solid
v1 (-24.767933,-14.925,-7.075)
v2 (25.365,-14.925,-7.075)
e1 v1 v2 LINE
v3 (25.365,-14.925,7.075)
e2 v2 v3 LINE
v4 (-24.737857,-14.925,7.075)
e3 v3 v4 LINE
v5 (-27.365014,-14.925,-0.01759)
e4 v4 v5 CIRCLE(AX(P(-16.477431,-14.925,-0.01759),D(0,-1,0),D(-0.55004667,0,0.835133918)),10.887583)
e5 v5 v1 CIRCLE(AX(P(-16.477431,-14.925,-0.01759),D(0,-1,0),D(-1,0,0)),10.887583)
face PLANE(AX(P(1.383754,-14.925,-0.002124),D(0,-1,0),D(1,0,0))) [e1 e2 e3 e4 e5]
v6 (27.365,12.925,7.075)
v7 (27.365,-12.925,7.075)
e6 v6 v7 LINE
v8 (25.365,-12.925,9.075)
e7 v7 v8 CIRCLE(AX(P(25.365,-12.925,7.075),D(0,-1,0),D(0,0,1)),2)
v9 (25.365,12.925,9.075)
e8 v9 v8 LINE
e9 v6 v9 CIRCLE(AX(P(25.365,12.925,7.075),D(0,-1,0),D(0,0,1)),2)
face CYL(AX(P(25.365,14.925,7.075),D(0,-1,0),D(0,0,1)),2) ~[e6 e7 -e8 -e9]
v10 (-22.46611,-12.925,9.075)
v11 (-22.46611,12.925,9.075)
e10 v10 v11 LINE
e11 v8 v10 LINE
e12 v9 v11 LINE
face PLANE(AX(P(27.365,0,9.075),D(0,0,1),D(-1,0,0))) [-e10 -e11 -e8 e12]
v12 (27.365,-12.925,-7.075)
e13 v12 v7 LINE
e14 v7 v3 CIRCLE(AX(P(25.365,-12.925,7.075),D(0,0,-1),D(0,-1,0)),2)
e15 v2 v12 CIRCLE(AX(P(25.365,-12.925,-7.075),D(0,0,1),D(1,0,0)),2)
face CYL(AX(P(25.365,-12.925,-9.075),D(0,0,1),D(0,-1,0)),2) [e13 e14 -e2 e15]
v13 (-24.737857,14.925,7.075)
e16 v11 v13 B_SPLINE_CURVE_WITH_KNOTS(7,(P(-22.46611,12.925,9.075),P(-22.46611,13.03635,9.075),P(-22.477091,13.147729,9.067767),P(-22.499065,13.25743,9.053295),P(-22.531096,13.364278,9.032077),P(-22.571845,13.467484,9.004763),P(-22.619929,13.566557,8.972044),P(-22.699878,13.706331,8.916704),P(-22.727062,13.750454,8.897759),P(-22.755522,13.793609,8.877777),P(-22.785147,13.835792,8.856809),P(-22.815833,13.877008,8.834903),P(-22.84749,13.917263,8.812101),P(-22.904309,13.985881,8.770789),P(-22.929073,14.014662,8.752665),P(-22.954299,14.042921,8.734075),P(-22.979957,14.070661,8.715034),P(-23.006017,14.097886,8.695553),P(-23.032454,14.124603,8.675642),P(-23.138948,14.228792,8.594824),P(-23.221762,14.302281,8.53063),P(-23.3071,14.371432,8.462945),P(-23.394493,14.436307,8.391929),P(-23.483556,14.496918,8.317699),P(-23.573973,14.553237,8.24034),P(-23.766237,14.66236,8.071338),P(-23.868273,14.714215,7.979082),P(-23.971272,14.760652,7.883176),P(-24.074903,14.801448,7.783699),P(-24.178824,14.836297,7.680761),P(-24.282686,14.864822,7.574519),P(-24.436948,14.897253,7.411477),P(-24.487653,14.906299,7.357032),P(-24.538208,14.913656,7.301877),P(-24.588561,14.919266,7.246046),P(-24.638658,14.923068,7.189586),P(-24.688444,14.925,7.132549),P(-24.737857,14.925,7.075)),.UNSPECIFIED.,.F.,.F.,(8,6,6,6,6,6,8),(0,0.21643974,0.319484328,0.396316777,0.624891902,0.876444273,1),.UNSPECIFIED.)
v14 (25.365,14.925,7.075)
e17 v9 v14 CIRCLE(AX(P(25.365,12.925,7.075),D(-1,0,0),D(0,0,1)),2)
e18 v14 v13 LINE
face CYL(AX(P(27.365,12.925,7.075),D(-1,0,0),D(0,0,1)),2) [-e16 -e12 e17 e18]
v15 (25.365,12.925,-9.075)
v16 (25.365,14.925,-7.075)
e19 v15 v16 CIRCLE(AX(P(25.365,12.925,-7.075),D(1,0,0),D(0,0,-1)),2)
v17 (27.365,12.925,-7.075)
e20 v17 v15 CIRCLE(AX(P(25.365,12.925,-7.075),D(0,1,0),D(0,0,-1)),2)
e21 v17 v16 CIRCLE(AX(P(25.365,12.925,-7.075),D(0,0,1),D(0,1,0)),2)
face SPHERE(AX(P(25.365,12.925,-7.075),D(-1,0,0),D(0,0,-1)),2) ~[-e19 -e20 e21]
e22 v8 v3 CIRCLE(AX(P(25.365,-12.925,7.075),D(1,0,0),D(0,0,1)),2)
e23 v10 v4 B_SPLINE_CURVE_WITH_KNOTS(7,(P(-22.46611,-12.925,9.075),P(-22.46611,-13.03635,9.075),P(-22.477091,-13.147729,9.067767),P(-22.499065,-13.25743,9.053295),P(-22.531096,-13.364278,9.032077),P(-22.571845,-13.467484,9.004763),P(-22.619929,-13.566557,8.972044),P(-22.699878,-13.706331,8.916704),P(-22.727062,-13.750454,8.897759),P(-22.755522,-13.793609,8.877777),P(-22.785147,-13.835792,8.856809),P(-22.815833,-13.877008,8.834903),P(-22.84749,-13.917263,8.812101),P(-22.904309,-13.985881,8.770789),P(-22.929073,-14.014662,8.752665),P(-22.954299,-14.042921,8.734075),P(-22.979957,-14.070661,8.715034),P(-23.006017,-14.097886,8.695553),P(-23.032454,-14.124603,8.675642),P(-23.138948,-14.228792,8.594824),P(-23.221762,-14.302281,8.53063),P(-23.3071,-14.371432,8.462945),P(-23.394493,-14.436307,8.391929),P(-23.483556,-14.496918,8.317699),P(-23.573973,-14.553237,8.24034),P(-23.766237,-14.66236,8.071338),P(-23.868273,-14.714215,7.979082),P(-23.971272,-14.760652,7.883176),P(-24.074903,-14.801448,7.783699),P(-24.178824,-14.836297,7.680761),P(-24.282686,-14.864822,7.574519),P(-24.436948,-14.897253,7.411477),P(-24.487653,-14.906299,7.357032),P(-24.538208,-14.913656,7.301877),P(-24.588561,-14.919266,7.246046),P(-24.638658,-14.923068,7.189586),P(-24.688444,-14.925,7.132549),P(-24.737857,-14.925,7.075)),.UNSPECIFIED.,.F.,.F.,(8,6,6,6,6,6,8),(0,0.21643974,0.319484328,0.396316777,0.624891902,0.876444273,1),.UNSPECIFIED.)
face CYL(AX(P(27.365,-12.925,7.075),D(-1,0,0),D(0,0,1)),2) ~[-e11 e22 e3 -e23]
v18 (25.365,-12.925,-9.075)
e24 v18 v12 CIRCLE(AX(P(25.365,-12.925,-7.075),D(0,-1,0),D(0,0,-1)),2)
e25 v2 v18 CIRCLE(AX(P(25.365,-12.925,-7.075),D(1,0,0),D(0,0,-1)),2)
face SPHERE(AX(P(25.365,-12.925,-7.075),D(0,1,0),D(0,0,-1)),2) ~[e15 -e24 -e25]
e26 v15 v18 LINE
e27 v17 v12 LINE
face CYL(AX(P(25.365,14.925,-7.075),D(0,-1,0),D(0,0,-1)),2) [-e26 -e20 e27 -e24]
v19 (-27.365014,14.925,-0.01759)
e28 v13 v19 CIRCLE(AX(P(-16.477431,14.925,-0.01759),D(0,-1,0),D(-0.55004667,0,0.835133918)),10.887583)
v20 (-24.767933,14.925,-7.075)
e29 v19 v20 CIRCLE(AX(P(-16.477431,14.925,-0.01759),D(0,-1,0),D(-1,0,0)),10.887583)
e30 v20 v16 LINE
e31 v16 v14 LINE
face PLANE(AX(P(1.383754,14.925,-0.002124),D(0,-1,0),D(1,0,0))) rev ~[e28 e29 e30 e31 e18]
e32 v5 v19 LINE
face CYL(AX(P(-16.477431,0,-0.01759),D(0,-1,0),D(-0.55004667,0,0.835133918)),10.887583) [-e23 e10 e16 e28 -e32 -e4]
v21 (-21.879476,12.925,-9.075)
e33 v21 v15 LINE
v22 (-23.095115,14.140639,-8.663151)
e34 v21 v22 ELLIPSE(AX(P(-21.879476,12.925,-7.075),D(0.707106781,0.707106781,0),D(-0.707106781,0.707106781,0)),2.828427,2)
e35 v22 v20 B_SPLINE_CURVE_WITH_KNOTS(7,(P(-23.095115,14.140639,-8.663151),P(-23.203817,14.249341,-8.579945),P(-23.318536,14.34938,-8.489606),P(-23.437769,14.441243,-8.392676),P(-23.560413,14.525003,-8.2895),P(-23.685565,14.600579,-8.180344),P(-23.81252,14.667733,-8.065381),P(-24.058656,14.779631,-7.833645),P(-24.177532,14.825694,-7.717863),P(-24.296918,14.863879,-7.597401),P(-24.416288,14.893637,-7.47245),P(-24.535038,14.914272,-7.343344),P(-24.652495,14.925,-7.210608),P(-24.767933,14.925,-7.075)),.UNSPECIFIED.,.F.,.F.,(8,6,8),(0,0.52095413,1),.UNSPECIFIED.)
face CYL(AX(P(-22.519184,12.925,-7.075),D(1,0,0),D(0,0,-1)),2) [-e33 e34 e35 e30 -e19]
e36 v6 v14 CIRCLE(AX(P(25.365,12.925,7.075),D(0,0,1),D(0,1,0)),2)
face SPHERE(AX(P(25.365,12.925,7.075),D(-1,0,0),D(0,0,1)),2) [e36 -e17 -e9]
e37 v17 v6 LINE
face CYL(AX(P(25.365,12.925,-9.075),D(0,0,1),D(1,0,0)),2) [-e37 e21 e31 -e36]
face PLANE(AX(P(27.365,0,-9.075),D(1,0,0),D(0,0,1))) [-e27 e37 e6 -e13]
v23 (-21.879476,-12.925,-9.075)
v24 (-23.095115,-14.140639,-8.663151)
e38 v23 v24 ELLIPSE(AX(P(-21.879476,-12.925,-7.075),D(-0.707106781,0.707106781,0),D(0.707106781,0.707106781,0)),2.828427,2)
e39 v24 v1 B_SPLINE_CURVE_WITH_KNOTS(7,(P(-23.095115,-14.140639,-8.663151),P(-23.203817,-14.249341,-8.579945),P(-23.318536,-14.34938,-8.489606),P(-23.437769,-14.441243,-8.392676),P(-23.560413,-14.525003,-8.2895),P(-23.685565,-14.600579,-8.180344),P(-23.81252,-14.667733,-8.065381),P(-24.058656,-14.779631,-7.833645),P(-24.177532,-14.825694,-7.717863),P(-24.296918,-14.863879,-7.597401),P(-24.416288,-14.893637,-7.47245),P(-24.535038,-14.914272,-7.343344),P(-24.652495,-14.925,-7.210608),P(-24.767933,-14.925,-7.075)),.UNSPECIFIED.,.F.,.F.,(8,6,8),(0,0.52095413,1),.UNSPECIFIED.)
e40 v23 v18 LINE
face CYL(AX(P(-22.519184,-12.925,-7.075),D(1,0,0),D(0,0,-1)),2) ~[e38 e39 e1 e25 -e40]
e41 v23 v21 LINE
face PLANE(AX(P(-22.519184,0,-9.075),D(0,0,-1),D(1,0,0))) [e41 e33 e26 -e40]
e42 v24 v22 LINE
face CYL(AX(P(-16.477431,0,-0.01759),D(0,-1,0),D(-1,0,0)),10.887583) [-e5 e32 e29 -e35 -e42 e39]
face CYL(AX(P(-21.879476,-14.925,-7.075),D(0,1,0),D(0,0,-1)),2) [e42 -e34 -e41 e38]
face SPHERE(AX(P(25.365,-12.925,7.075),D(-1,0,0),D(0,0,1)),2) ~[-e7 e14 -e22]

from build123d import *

# Parameters (mm, degrees)
F1_DEPTH = 14.925
F2_R     = 2


with BuildPart() as f1:
    # F0 (on Front) → F1 (new body, symmetric)
    with BuildSketch(Plane.XZ):
        with BuildLine():
            Line((-22.5191842765, -9.075), (27.365, -9.075))
            Line((27.365, -9.075), (27.365, 9.075))
            Line((27.365, 9.075), (-22.4661100656, 9.075))
            ThreePointArc((-22.4661100656, 9.075), (-26.0623595245, 5.1465764849), (-27.3650142087, -0.0175896876))
            ThreePointArc((-27.3650142087, -0.0175896876), (-26.0774195294, -5.1537056642), (-22.5191842765, -9.075))
        make_face()
    extrude(amount=F1_DEPTH, both=True)

    # F2
    f2_edges = [f1.edges().sort_by_distance(p)[0] for p in [
        (2.449445, -14.925, 9.075),
        (2.449445, 14.925, 9.075),
        (27.365, 7.4625, 9.075),
        (27.365, -7.4625, 9.075),
        (-22.519184, 7.4625, -9.075),
        (2.422908, 14.925, -9.075),
        (27.365, 7.4625, -9.075),
        (27.365, -7.4625, -9.075),
        (2.422908, -14.925, -9.075),
        (-22.519184, -7.4625, -9.075),
        (27.365, -14.925, 0),
        (27.365, 14.925, 0),
    ]]
    fillet(f2_edges, radius=F2_R)


solid = f1.part
